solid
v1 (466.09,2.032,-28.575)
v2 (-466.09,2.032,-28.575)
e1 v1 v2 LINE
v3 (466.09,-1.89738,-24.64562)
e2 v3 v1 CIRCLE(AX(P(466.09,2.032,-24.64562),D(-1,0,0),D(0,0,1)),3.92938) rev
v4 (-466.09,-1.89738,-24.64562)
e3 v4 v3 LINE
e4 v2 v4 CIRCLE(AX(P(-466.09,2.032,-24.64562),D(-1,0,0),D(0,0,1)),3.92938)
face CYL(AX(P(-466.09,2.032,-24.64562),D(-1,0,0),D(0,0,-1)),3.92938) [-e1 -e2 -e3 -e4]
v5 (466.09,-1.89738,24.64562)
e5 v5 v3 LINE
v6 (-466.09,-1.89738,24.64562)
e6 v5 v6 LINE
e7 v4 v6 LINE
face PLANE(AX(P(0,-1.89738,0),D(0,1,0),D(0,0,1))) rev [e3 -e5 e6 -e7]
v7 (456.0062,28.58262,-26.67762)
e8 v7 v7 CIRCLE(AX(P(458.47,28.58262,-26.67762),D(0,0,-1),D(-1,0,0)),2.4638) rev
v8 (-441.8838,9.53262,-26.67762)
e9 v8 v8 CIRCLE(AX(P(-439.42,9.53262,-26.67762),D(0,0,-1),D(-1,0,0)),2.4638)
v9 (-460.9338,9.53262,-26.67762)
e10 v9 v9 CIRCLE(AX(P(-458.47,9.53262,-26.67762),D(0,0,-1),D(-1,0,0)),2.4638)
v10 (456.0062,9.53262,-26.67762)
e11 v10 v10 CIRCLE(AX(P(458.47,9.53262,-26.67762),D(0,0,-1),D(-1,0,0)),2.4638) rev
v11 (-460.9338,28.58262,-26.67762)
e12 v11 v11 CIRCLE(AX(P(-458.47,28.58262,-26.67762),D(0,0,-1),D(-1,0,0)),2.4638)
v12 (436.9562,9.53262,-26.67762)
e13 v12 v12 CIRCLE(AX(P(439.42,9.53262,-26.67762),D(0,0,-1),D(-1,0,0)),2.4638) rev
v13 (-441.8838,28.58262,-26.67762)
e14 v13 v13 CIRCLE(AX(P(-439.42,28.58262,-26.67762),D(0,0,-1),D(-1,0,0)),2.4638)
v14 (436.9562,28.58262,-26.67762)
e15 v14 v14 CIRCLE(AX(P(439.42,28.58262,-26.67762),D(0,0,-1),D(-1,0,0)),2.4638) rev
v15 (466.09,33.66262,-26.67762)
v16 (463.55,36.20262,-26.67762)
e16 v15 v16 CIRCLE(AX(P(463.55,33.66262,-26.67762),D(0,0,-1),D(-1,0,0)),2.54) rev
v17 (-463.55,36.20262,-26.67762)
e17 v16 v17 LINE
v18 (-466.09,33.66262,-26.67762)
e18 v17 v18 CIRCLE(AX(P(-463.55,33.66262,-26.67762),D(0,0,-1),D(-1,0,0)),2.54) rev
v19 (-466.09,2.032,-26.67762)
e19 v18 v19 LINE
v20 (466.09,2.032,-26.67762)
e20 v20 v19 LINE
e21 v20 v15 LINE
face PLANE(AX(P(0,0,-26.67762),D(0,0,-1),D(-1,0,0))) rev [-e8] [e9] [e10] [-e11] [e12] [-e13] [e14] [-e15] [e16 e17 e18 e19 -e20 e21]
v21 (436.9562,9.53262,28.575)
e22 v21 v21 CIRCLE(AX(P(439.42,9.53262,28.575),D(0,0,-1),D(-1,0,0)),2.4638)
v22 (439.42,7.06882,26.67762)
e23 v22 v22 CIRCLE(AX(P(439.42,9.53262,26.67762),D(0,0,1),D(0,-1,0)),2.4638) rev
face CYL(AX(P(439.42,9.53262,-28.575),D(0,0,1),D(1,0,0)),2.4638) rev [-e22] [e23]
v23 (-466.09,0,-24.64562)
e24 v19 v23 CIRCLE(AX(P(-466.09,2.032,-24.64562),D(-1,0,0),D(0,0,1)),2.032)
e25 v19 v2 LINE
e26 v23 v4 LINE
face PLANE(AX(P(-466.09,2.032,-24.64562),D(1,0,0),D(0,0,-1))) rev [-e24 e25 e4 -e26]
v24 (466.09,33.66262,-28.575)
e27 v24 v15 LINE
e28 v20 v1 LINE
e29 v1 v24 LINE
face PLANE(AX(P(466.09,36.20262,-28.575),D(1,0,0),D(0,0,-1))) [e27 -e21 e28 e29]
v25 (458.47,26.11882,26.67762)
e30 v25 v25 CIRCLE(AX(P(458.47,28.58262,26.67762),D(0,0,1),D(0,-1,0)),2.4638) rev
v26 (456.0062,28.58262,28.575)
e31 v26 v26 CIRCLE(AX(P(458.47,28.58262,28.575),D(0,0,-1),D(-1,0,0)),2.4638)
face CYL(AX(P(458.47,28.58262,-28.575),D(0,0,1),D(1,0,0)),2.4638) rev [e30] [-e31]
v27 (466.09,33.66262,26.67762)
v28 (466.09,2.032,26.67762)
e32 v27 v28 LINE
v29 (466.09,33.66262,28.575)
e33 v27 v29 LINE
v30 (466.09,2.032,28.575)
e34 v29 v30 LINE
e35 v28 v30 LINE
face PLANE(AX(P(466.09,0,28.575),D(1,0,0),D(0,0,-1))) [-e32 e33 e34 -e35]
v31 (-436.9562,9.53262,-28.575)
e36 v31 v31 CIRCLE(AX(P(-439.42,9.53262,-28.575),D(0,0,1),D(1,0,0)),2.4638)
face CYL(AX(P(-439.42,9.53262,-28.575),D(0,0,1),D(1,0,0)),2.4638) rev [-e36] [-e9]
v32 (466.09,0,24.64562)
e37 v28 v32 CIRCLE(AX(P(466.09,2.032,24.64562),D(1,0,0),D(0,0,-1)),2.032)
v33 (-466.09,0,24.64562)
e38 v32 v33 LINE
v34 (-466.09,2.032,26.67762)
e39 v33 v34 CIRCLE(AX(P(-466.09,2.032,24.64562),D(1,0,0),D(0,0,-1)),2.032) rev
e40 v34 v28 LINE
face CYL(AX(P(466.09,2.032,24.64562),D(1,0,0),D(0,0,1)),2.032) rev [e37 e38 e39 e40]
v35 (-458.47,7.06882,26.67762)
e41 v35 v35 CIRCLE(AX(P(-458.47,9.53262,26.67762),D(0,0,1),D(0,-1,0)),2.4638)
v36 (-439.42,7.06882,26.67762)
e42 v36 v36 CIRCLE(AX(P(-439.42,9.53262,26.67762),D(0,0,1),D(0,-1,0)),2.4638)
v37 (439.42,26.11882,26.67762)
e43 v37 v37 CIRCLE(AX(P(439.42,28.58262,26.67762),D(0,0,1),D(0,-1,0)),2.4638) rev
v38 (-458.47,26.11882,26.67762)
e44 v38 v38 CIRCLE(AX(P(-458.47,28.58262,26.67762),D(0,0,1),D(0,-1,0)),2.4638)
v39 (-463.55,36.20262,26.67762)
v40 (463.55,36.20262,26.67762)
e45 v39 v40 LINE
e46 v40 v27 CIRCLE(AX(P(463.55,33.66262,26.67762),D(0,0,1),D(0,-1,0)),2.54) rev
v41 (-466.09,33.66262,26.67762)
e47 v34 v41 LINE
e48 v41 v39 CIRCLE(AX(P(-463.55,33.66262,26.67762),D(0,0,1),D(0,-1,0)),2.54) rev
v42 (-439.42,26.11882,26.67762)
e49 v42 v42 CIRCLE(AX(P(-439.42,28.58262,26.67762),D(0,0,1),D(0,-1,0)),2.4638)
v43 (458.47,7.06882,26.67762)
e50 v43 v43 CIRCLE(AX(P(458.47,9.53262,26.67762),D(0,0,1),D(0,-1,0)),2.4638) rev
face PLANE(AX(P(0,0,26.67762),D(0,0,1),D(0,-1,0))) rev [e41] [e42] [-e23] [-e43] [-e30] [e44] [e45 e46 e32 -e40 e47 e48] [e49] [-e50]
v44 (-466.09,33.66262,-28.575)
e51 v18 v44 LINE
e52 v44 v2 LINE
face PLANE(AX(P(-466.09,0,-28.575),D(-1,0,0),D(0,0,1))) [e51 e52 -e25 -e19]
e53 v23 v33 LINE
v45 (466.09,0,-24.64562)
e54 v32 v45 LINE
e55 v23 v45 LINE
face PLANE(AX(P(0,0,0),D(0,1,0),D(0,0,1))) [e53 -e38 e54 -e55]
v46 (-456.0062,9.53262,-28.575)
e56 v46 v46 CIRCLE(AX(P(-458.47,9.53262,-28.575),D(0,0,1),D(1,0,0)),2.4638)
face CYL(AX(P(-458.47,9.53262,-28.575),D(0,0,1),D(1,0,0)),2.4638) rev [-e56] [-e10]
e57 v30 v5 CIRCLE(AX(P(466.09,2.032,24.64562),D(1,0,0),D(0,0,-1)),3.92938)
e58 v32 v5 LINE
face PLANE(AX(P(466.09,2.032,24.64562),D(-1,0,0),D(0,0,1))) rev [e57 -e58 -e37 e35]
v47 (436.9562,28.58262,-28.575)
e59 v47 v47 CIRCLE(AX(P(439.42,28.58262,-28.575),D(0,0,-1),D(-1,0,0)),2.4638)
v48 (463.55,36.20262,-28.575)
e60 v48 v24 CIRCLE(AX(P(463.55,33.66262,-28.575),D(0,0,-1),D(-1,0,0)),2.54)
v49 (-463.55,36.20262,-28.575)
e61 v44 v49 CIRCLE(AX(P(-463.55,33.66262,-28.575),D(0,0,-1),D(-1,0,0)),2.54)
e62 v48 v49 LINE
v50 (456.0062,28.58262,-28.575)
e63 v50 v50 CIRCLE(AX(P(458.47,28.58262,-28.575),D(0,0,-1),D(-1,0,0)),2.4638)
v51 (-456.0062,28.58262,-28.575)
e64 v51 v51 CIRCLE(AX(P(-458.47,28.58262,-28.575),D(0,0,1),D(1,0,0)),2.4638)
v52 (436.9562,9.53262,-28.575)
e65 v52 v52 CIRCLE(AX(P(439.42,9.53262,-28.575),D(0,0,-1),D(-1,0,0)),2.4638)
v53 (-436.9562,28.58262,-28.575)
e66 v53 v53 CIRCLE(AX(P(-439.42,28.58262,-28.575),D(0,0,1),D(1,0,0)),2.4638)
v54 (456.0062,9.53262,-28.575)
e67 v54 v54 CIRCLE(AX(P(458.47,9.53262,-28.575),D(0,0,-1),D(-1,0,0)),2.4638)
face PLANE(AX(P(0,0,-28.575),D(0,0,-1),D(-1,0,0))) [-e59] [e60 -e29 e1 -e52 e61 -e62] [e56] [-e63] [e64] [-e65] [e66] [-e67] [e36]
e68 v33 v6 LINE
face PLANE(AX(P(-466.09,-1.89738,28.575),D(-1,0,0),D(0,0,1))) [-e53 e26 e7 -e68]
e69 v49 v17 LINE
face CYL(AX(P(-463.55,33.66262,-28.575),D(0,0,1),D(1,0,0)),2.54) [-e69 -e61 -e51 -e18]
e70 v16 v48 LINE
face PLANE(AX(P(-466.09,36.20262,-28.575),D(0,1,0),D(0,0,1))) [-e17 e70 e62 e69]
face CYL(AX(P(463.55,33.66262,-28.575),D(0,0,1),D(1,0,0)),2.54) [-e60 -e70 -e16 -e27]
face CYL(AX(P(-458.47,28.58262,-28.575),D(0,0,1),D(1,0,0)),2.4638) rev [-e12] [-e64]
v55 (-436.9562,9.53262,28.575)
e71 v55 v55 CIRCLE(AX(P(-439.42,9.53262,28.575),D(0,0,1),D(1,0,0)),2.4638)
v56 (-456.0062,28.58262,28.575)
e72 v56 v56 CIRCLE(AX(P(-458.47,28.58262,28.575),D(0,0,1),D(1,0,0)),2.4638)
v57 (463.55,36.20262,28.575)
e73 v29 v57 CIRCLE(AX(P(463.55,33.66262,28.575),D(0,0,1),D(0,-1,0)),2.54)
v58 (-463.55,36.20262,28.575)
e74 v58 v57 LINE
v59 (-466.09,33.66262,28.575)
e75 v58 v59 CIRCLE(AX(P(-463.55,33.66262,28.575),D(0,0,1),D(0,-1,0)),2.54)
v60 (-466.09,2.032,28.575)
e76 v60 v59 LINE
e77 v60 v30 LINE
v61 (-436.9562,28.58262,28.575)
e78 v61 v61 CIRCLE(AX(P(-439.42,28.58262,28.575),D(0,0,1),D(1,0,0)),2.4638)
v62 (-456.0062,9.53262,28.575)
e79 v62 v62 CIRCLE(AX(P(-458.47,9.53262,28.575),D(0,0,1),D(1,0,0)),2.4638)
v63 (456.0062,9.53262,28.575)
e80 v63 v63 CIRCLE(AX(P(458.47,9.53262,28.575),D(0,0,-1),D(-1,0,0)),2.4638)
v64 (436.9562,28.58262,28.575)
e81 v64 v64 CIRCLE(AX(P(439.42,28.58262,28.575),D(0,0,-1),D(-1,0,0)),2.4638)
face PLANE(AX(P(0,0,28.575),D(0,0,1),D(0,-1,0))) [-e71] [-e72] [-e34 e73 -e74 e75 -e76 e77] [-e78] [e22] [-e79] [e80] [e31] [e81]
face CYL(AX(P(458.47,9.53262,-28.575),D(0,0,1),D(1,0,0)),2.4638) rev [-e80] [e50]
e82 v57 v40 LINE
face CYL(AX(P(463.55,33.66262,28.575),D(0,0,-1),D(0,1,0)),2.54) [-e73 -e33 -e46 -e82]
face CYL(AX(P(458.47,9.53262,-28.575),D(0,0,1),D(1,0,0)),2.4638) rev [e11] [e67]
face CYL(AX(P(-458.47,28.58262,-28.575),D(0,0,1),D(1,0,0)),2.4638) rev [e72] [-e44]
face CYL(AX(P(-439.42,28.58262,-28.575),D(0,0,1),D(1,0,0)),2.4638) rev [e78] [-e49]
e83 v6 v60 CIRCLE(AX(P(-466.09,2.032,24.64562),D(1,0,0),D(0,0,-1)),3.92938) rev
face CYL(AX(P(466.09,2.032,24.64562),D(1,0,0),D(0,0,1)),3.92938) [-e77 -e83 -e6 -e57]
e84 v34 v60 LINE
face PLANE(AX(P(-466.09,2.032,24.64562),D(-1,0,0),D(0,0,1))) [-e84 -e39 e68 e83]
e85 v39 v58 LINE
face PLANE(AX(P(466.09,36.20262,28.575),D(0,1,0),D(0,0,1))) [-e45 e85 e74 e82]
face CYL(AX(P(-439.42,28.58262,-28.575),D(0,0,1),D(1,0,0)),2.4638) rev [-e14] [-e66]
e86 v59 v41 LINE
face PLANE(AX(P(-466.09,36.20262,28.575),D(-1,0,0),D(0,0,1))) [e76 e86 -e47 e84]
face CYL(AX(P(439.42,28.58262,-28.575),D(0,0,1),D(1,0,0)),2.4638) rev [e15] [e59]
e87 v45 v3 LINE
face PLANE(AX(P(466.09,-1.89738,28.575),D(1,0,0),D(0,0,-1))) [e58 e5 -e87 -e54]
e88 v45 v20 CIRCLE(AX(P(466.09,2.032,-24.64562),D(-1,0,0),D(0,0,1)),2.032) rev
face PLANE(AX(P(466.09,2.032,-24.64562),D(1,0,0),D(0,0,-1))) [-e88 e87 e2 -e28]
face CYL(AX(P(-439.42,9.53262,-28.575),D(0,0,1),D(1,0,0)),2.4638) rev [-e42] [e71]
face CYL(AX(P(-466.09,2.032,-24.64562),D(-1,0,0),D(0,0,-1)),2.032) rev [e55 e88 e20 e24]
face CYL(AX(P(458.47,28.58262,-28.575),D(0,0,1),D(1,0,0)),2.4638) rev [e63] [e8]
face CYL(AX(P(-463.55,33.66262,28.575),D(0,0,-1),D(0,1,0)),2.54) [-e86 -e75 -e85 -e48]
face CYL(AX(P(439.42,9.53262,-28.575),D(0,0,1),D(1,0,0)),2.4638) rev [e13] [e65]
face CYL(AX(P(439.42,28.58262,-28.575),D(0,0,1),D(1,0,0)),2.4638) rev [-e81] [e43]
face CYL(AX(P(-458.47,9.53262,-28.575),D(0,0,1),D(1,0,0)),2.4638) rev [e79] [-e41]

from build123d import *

# Parameters (mm, degrees)
SKETCH1_W                    = 932.18
SKETCH1_H                    = 57.15
BASE_FLANGE1_DEPTH           = 1.89738
EDGE_FLANGE1_STRIP_W         = 11.65352
EDGE_FLANGE1_STRIP_H         = 1.89738
EDGE_FLANGE1_STRIP_CUT_DEPTH = 932.18
EDGE_FLANGE1_DEPTH           = 932.18
EDGE_FLANGE2_STRIP_W         = 11.65352
EDGE_FLANGE2_STRIP_H         = 1.89738
EDGE_FLANGE2_STRIP_CUT_DEPTH = 932.18
EDGE_FLANGE2_DEPTH           = 932.18
SKETCH12_R                   = 2.4638
CUT_EXTRUDE1_DEPTH           = 471.97413973
FILLET1_R                    = 2.54


# Sheet-metal steps are written as plain solids
with BuildPart() as part:
    # Sketch1 → Base-Flange1 (new body)
    with BuildSketch(Plane(origin=(0, 0, 0), x_dir=(1, 0, 0), z_dir=(0, 1, 0))):
        Rectangle(SKETCH1_W, SKETCH1_H)
    extrude(amount=-BASE_FLANGE1_DEPTH)

    # Edge-Flange1 strip (across the edge) → Edge-Flange1 strip cut (cut)
    with BuildSketch(Plane(origin=(-466.09, 0, 28.575), x_dir=(0, 0, -1), z_dir=(1, 0, 0))):
        with Locations((-1.89738, -0.94869)):
            Rectangle(EDGE_FLANGE1_STRIP_W, EDGE_FLANGE1_STRIP_H)
    extrude(amount=EDGE_FLANGE1_STRIP_CUT_DEPTH, mode=Mode.SUBTRACT)

    # Edge-Flange1 section (across the edge) → Edge-Flange1 (add)
    with BuildSketch(Plane(origin=(-466.09, 0, 28.575), x_dir=(0, 0, -1), z_dir=(1, 0, 0))):
        with BuildLine():
            Line((0, 2.032), (0, 36.20262))
            Line((0, 36.20262), (1.89738, 36.20262))
            Line((1.89738, 36.20262), (1.89738, 2.032))
            ThreePointArc((1.89738, 2.032), (2.492539021, 0.595159021), (3.92938, 0))
            Line((3.92938, 0), (3.92938, -1.89738))
            ThreePointArc((3.92938, -1.89738), (1.150888756, -0.746491244), (0, 2.032))
        make_face()
    extrude(amount=EDGE_FLANGE1_DEPTH)

    # Edge-Flange2 strip (across the edge) → Edge-Flange2 strip cut (cut)
    with BuildSketch(Plane(origin=(466.09, 0, -28.575), x_dir=(0, 0, 1), z_dir=(-1, 0, 0))):
        with Locations((-1.89738, -0.94869)):
            Rectangle(EDGE_FLANGE2_STRIP_W, EDGE_FLANGE2_STRIP_H)
    extrude(amount=EDGE_FLANGE2_STRIP_CUT_DEPTH, mode=Mode.SUBTRACT)

    # Edge-Flange2 section (across the edge) → Edge-Flange2 (add)
    with BuildSketch(Plane(origin=(466.09, 0, -28.575), x_dir=(0, 0, 1), z_dir=(-1, 0, 0))):
        with BuildLine():
            Line((0, 2.032), (0, 36.20262))
            Line((0, 36.20262), (1.89738, 36.20262))
            Line((1.89738, 36.20262), (1.89738, 2.032))
            ThreePointArc((1.89738, 2.032), (2.492539021, 0.595159021), (3.92938, 0))
            Line((3.92938, 0), (3.92938, -1.89738))
            ThreePointArc((3.92938, -1.89738), (1.150888756, -0.746491244), (0, 2.032))
        make_face()
    extrude(amount=EDGE_FLANGE2_DEPTH)

    # Sketch12 → Cut-Extrude1 (cut, through all)
    with BuildSketch(Plane.XY.offset(28.575)):
        with Locations((-458.47, 28.58262)):
            Circle(SKETCH12_R)
        with Locations((-458.47, 9.53262)):
            Circle(SKETCH12_R)
        with Locations((-439.42, 28.58262)):
            Circle(SKETCH12_R)
        with Locations((-439.42, 9.53262)):
            Circle(SKETCH12_R)
    cut_extrude1 = extrude(amount=-CUT_EXTRUDE1_DEPTH, mode=Mode.SUBTRACT)

    # Mirror1: Cut-Extrude1 across plane
    add(cut_extrude1.mirror(Plane(origin=(0, 0, 0), x_dir=(0, 0, 1), z_dir=(1, 0, 0))), mode=Mode.SUBTRACT)

    # Fillet1
    fillet1_edges = [part.edges().sort_by_distance(p)[0] for p in [
        (-466.09, 36.20262, 27.62631),
        (466.09, 36.20262, 27.62631),
        (466.09, 36.20262, -27.62631),
        (-466.09, 36.20262, -27.62631),
    ]]
    fillet(fillet1_edges, radius=FILLET1_R)


solid = part.part
